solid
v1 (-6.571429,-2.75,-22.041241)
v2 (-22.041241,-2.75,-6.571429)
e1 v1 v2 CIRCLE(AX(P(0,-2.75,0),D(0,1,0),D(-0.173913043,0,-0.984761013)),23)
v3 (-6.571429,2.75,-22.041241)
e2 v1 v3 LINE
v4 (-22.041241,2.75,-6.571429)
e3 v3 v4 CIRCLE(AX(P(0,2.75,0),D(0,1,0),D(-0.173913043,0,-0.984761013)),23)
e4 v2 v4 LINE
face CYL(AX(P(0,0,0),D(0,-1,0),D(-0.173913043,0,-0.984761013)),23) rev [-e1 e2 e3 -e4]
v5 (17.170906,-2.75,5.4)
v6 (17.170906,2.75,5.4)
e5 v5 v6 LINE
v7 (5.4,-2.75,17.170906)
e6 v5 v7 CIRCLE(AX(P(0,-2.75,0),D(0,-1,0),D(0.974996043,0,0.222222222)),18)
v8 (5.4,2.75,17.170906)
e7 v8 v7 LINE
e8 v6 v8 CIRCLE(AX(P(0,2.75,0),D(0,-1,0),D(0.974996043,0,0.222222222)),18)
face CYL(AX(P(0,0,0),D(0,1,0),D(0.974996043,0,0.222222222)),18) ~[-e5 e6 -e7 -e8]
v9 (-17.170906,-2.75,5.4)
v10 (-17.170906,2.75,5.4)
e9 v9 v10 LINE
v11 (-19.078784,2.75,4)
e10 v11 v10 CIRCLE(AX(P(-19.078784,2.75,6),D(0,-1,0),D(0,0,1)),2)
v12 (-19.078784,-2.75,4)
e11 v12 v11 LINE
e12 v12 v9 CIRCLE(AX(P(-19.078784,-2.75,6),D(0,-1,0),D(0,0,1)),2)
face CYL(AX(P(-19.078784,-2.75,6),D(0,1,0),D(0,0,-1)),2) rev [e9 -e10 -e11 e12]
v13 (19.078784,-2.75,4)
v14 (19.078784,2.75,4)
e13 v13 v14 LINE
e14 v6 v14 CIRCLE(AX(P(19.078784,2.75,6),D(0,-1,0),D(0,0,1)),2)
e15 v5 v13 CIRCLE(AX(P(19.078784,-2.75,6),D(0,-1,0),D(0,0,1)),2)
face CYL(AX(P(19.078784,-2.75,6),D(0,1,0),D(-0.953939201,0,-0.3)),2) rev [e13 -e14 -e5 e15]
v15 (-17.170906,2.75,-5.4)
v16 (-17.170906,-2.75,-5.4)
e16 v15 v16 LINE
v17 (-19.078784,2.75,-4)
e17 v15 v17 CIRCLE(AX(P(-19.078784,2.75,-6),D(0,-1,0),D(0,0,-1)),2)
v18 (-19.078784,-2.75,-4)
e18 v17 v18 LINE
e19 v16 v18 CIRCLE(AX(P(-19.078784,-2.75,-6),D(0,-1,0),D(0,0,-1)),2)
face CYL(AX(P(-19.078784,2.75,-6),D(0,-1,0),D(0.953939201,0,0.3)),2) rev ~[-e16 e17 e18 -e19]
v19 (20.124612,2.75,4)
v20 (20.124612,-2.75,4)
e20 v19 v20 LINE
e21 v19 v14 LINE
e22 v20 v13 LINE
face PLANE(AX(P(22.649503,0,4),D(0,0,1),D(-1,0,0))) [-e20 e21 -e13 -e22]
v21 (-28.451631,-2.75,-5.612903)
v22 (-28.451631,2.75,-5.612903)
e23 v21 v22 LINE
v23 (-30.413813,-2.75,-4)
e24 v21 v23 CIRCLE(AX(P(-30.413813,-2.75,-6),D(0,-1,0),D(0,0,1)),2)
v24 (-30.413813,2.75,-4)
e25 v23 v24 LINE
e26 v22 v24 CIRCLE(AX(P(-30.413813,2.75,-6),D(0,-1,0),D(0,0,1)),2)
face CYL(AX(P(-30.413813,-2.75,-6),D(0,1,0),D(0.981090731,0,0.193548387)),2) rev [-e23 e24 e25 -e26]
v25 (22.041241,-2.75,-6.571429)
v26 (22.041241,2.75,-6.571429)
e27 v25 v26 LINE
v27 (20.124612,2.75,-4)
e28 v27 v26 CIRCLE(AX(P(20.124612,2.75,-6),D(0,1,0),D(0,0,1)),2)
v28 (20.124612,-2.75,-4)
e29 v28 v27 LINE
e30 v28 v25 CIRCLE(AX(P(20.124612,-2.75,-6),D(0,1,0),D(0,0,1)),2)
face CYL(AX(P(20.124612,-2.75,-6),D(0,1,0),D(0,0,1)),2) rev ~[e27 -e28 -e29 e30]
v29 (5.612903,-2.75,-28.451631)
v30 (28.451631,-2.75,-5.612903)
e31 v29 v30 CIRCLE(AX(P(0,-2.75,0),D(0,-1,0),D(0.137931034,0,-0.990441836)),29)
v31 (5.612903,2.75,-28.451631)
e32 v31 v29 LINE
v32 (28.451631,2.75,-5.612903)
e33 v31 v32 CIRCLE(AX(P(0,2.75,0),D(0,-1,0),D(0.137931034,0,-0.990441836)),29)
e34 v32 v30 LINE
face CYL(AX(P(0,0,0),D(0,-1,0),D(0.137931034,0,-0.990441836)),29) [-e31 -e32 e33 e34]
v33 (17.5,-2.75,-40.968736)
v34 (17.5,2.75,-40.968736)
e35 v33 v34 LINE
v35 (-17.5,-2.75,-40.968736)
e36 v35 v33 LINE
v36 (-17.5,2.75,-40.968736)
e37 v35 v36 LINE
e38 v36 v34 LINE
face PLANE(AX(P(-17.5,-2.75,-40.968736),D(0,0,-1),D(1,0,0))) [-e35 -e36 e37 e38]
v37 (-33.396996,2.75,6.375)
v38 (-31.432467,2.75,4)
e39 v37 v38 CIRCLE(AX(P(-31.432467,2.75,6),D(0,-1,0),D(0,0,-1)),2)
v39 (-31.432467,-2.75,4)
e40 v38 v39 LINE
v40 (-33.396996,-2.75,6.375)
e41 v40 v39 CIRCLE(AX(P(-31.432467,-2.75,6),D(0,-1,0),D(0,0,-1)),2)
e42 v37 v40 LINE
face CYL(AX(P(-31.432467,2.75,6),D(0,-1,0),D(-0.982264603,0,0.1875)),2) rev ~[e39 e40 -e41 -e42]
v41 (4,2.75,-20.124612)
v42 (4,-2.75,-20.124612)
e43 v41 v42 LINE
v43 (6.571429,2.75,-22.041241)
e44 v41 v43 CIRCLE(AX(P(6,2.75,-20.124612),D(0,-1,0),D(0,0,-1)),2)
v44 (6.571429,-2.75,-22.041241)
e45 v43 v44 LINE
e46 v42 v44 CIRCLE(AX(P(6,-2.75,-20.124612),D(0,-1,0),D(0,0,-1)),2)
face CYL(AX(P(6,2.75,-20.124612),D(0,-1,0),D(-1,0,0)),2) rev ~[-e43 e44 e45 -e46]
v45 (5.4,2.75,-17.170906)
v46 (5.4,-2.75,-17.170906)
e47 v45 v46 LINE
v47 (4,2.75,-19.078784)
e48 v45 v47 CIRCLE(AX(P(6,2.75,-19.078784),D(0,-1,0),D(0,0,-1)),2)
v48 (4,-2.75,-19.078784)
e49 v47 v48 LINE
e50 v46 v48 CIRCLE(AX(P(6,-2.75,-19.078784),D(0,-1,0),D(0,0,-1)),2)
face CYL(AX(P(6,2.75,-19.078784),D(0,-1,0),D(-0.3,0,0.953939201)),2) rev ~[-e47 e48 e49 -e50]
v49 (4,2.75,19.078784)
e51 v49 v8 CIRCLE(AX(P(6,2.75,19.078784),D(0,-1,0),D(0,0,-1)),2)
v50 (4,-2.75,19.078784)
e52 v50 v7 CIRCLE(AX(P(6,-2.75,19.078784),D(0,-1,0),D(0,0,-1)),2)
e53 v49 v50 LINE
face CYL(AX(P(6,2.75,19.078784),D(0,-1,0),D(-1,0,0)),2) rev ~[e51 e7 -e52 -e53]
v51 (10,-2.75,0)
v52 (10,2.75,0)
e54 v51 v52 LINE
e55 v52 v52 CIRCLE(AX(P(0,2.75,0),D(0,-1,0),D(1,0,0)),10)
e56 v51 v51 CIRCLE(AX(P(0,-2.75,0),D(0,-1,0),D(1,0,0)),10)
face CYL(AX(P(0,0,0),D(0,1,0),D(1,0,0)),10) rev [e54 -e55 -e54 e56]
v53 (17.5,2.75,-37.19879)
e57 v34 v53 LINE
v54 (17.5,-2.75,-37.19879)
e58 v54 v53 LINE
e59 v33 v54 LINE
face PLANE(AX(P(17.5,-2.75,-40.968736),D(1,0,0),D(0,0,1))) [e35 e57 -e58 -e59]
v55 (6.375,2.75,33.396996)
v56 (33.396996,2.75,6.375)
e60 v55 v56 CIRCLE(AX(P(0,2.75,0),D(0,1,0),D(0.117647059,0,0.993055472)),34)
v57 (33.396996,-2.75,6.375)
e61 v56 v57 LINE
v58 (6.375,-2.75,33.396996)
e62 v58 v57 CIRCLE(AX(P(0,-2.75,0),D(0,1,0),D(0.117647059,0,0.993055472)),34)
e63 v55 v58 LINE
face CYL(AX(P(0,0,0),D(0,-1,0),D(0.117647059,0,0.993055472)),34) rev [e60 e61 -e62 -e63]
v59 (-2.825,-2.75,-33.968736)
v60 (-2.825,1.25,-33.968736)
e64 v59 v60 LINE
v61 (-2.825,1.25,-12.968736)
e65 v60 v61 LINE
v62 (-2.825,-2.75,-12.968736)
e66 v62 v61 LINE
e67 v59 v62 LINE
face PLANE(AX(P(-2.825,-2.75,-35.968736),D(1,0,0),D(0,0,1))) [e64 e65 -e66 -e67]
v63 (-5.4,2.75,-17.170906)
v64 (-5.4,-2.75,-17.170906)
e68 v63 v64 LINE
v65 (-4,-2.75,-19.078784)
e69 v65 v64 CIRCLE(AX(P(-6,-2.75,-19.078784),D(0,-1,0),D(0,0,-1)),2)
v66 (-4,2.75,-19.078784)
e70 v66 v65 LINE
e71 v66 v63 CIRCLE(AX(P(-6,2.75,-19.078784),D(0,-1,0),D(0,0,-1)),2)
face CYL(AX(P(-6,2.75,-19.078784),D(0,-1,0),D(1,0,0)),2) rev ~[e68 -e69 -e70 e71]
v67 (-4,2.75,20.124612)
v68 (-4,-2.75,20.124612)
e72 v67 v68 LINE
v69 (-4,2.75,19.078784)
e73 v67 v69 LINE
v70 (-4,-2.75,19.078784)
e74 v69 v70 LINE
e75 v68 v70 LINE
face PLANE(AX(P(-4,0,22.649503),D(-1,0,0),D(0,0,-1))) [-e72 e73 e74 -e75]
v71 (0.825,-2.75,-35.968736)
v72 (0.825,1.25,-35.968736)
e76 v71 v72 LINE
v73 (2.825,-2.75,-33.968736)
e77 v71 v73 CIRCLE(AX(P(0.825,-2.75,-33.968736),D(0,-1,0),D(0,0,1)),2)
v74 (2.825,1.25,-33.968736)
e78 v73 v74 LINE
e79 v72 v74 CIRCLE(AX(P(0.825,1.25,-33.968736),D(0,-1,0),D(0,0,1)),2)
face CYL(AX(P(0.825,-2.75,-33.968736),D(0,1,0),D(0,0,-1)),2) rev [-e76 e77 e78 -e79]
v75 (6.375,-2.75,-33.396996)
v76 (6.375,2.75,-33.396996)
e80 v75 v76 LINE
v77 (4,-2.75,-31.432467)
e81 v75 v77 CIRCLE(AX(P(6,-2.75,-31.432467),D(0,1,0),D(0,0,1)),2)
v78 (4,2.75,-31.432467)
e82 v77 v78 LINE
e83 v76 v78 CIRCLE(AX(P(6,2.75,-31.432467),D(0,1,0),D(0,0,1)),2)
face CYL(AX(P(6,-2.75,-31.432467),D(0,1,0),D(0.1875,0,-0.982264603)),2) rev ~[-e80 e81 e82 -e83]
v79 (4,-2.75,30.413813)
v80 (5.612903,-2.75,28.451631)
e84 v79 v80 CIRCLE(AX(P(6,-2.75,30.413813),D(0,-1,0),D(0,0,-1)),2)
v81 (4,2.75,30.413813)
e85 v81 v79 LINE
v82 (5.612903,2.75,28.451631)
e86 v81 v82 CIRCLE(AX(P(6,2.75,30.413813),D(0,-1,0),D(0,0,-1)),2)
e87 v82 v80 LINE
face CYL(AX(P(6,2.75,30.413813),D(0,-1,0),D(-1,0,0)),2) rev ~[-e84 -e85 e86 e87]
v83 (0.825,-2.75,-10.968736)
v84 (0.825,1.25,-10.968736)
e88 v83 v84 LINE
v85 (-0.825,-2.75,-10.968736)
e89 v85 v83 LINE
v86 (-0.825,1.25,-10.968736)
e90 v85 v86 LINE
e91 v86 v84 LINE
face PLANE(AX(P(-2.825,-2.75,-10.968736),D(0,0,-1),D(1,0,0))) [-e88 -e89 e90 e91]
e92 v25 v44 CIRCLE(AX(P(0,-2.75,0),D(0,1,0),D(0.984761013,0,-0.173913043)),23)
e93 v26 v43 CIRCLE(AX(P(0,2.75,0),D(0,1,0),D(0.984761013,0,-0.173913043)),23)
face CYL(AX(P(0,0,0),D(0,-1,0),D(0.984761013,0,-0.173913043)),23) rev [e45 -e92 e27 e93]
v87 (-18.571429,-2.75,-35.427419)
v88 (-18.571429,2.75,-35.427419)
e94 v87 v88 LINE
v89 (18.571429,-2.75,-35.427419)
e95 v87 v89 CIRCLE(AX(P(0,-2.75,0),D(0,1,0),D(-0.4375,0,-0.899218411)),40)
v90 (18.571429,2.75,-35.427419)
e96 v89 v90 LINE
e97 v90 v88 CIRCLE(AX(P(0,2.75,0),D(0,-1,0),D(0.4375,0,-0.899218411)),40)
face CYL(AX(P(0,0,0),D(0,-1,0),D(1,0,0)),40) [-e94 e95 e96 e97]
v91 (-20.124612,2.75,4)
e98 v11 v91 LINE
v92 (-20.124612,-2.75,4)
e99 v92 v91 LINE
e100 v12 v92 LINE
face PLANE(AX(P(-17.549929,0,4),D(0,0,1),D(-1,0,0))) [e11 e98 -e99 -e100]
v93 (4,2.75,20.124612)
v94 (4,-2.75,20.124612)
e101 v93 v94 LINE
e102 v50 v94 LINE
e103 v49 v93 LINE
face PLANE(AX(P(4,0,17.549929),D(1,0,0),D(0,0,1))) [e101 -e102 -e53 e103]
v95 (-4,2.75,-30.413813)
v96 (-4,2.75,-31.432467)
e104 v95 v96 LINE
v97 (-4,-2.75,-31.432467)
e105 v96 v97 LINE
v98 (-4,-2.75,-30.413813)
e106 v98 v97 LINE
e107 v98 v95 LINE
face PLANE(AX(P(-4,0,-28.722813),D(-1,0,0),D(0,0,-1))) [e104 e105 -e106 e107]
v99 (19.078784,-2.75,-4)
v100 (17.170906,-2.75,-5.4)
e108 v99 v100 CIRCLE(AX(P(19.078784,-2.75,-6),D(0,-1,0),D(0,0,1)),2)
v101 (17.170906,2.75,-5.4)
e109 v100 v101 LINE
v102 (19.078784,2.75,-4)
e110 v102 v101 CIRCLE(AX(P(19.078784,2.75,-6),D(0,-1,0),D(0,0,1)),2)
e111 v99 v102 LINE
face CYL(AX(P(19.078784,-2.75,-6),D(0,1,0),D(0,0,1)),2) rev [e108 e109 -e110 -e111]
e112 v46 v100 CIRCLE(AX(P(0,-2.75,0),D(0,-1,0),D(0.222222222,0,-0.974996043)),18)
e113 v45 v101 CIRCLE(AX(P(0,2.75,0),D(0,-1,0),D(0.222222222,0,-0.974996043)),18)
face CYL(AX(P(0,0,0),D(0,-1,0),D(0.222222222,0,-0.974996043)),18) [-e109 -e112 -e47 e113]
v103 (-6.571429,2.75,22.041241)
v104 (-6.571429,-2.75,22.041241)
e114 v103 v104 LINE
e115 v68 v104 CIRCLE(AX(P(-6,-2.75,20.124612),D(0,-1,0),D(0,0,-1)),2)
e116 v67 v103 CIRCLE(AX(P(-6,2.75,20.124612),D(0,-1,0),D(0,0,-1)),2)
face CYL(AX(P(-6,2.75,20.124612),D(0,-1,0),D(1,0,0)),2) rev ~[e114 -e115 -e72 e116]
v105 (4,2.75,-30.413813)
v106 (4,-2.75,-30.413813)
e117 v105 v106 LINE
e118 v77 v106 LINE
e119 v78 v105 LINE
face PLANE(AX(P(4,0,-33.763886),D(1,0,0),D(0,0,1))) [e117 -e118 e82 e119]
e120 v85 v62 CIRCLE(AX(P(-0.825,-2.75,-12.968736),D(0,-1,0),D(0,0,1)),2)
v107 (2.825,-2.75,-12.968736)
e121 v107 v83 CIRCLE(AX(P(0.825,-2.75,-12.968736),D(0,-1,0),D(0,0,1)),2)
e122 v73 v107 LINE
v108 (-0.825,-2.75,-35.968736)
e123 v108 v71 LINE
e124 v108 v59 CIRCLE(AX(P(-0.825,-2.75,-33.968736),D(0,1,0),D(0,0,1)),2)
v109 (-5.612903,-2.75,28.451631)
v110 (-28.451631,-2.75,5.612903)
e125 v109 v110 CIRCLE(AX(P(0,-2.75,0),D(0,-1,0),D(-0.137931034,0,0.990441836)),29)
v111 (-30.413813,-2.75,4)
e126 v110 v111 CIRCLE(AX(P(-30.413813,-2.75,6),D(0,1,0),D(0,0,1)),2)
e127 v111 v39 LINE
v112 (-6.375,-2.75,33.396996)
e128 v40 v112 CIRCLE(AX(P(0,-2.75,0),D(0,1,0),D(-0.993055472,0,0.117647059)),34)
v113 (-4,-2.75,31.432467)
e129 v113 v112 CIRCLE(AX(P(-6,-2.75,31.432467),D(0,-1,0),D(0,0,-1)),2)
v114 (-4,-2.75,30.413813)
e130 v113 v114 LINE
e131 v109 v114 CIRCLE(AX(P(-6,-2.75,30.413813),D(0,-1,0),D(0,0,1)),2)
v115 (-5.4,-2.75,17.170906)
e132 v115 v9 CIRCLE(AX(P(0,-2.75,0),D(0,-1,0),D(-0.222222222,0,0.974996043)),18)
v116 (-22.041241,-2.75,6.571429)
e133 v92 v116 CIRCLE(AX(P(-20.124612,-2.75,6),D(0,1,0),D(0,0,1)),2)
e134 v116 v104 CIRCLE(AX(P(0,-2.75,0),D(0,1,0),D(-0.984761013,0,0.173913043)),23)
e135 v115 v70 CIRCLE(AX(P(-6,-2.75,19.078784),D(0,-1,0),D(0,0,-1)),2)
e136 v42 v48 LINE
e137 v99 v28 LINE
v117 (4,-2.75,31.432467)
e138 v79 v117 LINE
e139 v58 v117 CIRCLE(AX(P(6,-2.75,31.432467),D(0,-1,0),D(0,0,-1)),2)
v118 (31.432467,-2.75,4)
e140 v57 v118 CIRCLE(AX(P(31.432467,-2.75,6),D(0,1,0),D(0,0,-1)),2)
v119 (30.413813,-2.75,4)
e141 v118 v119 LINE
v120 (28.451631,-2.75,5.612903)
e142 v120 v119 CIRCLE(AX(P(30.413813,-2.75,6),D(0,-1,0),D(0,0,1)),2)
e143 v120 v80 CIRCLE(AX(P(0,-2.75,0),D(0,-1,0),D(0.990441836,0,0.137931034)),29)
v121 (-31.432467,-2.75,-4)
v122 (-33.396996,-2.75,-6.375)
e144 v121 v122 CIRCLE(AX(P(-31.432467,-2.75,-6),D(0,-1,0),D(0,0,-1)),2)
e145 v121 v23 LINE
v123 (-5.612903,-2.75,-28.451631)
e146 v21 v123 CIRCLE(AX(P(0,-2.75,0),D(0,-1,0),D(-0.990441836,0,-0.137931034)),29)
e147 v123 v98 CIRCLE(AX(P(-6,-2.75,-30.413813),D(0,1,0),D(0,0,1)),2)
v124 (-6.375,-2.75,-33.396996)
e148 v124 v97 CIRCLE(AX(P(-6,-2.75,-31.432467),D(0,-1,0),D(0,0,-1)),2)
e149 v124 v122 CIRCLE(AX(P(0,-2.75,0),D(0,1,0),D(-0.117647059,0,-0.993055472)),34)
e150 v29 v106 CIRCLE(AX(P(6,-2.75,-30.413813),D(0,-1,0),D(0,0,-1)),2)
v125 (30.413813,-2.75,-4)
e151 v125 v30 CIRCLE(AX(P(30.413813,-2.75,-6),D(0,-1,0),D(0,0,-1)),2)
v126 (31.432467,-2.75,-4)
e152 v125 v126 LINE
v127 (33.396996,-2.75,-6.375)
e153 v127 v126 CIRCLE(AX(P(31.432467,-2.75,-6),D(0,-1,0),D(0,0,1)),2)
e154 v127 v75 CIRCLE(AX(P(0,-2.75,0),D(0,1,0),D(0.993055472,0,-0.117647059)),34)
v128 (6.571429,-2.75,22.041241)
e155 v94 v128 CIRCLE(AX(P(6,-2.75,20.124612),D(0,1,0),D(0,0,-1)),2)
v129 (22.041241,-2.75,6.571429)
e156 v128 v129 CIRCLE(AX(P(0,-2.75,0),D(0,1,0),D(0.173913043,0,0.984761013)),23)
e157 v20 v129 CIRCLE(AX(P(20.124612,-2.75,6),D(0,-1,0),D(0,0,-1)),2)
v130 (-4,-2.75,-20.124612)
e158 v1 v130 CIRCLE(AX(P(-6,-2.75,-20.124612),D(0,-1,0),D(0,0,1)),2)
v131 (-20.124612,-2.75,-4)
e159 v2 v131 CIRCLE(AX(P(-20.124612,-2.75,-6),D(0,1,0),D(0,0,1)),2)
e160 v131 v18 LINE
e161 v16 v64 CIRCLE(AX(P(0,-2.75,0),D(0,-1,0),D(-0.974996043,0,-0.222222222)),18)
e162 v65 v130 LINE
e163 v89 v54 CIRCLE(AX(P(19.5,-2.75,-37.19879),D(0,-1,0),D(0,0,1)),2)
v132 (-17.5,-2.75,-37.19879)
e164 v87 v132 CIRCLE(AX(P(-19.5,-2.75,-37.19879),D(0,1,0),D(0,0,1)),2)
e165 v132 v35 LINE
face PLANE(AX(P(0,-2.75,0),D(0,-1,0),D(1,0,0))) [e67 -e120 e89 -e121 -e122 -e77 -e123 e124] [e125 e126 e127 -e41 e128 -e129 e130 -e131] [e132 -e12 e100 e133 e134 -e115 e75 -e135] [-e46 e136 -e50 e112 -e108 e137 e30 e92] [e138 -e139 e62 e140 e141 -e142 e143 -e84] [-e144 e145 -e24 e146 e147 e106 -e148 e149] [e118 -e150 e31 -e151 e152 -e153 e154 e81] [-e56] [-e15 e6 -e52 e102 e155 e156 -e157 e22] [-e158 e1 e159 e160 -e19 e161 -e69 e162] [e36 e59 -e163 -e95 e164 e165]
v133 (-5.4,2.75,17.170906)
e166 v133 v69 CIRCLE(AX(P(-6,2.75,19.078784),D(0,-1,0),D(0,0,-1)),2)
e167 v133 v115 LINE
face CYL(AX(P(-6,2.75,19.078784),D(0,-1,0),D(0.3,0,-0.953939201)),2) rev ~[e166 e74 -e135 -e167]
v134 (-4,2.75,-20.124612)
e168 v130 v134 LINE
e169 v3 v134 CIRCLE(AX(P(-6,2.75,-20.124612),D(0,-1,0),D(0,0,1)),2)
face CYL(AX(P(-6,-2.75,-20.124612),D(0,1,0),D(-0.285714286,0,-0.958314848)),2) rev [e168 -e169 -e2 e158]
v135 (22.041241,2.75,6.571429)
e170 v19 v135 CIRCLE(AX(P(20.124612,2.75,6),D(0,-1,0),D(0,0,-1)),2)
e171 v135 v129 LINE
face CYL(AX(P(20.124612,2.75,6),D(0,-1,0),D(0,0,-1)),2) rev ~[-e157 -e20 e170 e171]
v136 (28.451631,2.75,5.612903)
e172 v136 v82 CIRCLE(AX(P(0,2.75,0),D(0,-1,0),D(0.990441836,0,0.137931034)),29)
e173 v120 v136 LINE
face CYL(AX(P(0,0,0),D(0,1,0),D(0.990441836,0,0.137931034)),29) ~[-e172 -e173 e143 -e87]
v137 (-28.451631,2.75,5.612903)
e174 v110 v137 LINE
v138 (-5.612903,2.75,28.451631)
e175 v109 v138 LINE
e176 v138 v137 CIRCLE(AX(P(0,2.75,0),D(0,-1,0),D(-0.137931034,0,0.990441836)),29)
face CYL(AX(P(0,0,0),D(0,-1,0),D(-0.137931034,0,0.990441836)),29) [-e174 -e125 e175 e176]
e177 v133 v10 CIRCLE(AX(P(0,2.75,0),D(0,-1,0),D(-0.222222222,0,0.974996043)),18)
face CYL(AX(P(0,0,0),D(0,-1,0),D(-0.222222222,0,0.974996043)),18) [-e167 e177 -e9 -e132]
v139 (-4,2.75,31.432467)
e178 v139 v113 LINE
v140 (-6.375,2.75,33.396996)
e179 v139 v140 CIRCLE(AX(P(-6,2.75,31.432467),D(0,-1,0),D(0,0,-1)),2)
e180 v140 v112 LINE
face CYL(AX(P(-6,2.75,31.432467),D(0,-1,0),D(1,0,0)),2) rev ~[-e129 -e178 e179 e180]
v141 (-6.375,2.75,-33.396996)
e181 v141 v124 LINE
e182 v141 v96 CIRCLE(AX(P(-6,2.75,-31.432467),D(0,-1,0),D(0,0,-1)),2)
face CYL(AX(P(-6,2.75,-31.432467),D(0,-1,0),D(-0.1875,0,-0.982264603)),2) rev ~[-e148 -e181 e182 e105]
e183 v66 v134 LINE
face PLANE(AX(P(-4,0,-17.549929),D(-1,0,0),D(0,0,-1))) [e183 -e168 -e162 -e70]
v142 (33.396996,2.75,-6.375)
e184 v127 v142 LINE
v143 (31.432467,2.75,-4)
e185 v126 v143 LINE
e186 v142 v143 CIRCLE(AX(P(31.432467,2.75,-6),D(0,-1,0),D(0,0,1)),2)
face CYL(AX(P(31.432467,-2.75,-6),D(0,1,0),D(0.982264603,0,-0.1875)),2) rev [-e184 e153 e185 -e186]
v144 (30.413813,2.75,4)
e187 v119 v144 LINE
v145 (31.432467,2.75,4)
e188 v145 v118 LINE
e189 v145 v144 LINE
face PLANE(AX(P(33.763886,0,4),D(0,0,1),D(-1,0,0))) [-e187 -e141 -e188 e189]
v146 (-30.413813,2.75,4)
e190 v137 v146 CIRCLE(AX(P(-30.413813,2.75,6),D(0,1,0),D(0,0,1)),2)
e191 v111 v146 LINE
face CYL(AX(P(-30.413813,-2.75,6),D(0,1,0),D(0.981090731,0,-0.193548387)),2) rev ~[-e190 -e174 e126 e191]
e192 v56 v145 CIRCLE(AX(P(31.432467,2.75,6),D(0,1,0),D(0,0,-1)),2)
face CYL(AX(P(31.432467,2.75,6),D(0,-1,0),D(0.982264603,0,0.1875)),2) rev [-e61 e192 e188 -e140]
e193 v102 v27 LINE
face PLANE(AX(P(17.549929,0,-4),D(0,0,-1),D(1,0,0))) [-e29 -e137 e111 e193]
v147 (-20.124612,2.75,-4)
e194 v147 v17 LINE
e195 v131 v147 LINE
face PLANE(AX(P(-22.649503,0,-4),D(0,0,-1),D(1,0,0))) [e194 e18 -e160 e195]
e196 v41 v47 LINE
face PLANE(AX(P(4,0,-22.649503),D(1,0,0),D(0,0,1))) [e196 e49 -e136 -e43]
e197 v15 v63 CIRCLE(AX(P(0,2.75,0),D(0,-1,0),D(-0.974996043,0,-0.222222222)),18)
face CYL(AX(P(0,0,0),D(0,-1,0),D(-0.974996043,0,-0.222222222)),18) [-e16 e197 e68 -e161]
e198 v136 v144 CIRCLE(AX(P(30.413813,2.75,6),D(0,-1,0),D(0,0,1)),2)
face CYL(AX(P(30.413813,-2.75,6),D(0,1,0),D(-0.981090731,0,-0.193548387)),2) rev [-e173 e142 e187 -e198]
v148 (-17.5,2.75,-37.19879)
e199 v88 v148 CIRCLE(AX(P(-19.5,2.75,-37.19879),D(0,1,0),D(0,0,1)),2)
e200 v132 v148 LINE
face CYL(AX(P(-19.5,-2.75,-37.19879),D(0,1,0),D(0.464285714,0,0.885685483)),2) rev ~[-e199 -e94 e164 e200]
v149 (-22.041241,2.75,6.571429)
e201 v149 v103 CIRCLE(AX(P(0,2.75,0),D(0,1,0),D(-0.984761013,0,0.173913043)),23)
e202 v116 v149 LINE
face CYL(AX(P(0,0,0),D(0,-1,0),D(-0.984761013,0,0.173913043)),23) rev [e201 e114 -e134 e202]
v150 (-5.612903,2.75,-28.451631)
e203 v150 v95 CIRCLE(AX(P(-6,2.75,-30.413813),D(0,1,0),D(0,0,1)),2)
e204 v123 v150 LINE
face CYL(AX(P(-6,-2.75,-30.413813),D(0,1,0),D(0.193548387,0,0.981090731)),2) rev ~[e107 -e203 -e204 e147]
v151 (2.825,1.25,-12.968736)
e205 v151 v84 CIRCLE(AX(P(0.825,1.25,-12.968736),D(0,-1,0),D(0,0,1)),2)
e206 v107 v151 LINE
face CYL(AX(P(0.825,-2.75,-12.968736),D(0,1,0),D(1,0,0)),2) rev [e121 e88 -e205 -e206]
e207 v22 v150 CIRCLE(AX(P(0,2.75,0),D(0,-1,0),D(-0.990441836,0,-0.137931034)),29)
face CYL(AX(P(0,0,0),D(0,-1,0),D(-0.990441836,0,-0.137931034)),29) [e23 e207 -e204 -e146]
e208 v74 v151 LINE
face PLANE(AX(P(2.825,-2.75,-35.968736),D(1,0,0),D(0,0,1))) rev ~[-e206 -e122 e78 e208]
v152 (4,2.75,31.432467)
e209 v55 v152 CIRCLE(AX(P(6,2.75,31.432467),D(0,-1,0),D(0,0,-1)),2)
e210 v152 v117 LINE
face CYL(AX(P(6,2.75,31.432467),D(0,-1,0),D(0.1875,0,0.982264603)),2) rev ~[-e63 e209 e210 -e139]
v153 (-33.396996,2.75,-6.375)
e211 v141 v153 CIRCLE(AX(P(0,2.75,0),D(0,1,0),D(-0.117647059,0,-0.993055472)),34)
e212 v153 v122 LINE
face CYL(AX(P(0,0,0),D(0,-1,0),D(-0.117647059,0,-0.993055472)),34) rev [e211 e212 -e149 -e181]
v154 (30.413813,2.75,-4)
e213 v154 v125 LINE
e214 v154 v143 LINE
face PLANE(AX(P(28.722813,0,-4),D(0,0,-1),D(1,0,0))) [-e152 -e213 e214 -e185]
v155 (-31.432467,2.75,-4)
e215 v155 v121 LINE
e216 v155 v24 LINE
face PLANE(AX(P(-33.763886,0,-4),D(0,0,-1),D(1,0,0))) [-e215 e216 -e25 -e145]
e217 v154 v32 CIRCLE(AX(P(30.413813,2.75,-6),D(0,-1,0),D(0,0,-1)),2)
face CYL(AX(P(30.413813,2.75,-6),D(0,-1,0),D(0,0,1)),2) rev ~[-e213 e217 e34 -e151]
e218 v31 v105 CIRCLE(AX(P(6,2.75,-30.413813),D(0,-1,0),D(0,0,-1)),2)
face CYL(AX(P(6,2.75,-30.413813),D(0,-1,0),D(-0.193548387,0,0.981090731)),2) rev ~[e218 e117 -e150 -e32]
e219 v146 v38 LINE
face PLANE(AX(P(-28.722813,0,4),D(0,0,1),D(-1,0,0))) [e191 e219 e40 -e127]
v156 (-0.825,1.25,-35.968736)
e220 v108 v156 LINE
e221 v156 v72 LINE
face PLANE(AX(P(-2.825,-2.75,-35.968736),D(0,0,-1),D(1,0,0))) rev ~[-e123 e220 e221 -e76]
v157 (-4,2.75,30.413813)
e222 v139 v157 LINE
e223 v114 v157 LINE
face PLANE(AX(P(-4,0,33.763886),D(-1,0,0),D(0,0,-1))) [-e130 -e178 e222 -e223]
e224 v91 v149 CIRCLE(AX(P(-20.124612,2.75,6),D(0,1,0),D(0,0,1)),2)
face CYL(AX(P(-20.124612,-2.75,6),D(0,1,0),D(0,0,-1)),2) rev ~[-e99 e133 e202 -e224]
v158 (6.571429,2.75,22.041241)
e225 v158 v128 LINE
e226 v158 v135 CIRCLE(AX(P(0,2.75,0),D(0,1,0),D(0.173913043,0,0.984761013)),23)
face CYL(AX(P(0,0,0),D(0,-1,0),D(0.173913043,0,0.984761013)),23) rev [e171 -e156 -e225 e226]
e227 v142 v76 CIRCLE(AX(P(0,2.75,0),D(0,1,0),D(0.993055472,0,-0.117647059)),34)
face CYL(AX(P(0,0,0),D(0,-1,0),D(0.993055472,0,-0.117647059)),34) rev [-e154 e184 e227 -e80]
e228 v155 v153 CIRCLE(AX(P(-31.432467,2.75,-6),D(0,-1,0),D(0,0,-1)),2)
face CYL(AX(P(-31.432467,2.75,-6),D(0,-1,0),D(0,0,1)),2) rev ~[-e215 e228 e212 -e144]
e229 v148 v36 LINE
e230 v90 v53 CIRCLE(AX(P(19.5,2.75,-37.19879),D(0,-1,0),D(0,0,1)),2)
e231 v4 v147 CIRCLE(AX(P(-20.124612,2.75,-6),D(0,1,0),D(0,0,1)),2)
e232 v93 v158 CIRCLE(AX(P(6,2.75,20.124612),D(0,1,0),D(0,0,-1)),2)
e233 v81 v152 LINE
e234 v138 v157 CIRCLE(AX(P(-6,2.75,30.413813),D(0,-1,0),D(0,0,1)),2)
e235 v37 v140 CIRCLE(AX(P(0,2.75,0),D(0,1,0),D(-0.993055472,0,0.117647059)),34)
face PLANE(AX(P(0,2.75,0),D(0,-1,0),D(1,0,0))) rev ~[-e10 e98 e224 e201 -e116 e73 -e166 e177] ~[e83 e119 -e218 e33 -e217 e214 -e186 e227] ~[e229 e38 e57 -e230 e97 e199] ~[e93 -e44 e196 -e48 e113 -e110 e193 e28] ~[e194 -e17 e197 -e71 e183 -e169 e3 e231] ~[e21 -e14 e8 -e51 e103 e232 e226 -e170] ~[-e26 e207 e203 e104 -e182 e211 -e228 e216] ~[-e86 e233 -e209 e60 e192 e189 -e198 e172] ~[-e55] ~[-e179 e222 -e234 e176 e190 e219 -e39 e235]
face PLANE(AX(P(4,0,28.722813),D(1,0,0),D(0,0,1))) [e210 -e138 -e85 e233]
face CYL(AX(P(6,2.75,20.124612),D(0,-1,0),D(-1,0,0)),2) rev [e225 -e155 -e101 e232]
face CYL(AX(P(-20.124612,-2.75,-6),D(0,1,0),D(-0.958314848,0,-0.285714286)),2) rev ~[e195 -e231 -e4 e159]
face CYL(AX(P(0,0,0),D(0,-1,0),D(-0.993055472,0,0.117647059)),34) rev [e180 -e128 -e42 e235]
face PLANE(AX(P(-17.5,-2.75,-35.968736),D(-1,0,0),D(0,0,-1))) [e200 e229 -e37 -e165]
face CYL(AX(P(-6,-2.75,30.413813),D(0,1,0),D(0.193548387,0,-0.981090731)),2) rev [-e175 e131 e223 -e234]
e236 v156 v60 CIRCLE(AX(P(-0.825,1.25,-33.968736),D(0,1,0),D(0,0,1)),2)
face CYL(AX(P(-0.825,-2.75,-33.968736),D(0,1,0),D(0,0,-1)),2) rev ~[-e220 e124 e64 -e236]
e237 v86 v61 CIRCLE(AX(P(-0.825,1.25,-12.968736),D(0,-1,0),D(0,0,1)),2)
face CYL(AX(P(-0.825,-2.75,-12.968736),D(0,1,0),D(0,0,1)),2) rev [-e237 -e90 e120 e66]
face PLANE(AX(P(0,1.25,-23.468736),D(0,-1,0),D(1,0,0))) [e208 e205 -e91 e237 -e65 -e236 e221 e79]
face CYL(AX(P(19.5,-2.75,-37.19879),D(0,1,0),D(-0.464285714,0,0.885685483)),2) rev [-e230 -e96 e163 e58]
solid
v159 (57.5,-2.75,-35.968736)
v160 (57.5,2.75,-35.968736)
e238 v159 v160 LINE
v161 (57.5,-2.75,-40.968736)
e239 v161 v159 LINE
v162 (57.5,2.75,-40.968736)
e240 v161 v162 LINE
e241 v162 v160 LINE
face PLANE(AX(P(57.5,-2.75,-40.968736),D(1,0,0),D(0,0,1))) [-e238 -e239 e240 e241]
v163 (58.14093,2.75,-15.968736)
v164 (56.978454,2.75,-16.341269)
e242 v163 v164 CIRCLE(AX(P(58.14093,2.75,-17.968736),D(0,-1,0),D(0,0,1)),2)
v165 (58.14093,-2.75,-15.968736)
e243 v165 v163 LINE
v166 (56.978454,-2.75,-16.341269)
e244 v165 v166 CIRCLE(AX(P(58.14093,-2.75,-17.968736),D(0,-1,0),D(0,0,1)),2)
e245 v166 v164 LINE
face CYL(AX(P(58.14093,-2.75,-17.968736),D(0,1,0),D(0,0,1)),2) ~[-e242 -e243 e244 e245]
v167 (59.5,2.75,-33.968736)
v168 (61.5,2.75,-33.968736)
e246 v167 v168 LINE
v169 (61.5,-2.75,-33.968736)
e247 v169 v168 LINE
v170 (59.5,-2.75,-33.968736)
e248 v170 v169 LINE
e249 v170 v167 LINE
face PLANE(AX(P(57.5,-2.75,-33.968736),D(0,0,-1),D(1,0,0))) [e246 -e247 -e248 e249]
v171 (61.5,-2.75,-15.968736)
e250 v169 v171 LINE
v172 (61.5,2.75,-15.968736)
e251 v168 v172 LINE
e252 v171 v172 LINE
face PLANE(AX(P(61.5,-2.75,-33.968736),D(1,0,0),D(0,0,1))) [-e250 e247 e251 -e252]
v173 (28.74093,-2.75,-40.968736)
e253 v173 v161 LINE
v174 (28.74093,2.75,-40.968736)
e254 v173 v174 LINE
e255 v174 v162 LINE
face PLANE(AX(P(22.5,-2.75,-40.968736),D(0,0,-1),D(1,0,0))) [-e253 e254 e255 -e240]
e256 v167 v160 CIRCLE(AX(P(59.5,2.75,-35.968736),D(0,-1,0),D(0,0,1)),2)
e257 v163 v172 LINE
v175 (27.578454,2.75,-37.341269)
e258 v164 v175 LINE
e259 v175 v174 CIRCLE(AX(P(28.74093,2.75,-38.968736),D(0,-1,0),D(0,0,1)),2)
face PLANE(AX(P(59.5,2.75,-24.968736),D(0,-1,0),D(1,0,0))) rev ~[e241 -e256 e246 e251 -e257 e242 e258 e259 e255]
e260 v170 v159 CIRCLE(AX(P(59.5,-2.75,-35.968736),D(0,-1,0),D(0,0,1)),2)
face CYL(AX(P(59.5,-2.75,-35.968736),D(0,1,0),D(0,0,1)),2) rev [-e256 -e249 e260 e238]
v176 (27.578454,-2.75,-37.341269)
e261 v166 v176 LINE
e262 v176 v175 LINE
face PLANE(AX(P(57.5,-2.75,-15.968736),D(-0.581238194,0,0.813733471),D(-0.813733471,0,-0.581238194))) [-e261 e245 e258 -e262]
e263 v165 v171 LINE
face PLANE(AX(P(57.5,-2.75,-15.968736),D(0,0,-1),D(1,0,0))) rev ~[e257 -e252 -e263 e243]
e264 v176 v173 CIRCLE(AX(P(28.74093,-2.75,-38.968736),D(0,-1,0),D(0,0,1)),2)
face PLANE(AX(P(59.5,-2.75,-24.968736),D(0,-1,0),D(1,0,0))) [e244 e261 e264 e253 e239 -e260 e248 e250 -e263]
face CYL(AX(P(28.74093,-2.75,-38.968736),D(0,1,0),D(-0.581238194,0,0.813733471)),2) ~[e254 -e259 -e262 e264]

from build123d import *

# Parameters (mm, degrees)
F0_R      = 40
F0_R_2    = 10
F1_DEPTH  = 2.75
F3_DEPTH  = 5.5
F5_DEPTH  = 5.5
F6_R      = 2
F6_2_R    = 2
F7_W      = 4
F7_H      = 18
F8_DEPTH  = 5.5
F9_R      = 2
F10_W     = 5.65
F10_H     = 25
F11_DEPTH = 4
F12_R     = 2


with BuildPart() as f1:
    # F0 (on Front) → F1 (new body, symmetric)
    with BuildSketch(Plane.XZ):
        Circle(F0_R)
        with BuildLine():
            ThreePointArc((-4, -33.7638860323), (-24.0416305603, -24.0416305603), (-33.7638860323, -4))
            Line((-33.7638860323, -4), (-28.7228132327, -4))
            ThreePointArc((-28.7228132327, -4), (-20.5060966544, -20.5060966544), (-4, -28.7228132327))
            Line((-4, -28.7228132327), (-4, -33.7638860323))
        make_face(mode=Mode.SUBTRACT)
        with BuildLine():
            ThreePointArc((-17.5499287748, -4), (-12.7279220614, -12.7279220614), (-4, -17.5499287748))
            Line((-4, -17.5499287748), (-4, -22.6495033058))
            ThreePointArc((-4, -22.6495033058), (-16.2634559673, -16.2634559673), (-22.6495033058, -4))
            Line((-22.6495033058, -4), (-17.5499287748, -4))
        make_face(mode=Mode.SUBTRACT)
        with BuildLine():
            ThreePointArc((4, -28.7228132327), (20.5060966544, -20.5060966544), (28.7228132327, -4))
            Line((28.7228132327, -4), (33.7638860323, -4))
            ThreePointArc((33.7638860323, -4), (24.0416305603, -24.0416305603), (4, -33.7638860323))
            Line((4, -33.7638860323), (4, -28.7228132327))
        make_face(mode=Mode.SUBTRACT)
        with BuildLine():
            Line((4, -22.6495033058), (4, -17.5499287748))
            ThreePointArc((4, -17.5499287748), (12.7279220614, -12.7279220614), (17.5499287748, -4))
            Line((17.5499287748, -4), (22.6495033058, -4))
            ThreePointArc((22.6495033058, -4), (16.2634559673, -16.2634559673), (4, -22.6495033058))
        make_face(mode=Mode.SUBTRACT)
        with BuildLine():
            Line((-4, 22.6495033058), (-4, 17.5499287748))
            ThreePointArc((-4, 17.5499287748), (-12.7279220614, 12.7279220614), (-17.5499287748, 4))
            Line((-17.5499287748, 4), (-22.6495033058, 4))
            ThreePointArc((-22.6495033058, 4), (-16.2634559673, 16.2634559673), (-4, 22.6495033058))
        make_face(mode=Mode.SUBTRACT)
        with BuildLine():
            ThreePointArc((-33.7638860323, 4), (-24.0416305603, 24.0416305603), (-4, 33.7638860323))
            Line((-4, 33.7638860323), (-4, 28.7228132327))
            ThreePointArc((-4, 28.7228132327), (-20.5060966544, 20.5060966544), (-28.7228132327, 4))
            Line((-28.7228132327, 4), (-33.7638860323, 4))
        make_face(mode=Mode.SUBTRACT)
        Circle(F0_R_2, mode=Mode.SUBTRACT)
        with BuildLine():
            Line((22.6495033058, 4), (17.5499287748, 4))
            ThreePointArc((17.5499287748, 4), (12.7279220614, 12.7279220614), (4, 17.5499287748))
            Line((4, 17.5499287748), (4, 22.6495033058))
            ThreePointArc((4, 22.6495033058), (16.2634559673, 16.2634559673), (22.6495033058, 4))
        make_face(mode=Mode.SUBTRACT)
        with BuildLine():
            ThreePointArc((28.7228132327, 4), (20.5060966544, 20.5060966544), (4, 28.7228132327))
            Line((4, 28.7228132327), (4, 33.7638860323))
            ThreePointArc((4, 33.7638860323), (24.0416305603, 24.0416305603), (33.7638860323, 4))
            Line((33.7638860323, 4), (28.7228132327, 4))
        make_face(mode=Mode.SUBTRACT)
    extrude(amount=F1_DEPTH, both=True)

    # F2 (on face) → F3 (join)
    with BuildSketch(Plane.XZ.offset(2.75)):
        with BuildLine():
            ThreePointArc((17.5, -35.9687364248), (0, -40), (-17.5, -35.9687364248))
            Line((-17.5, -35.9687364248), (-17.5, -40.9687364248))
            Line((-17.5, -40.9687364248), (17.5, -40.9687364248))
            Line((17.5, -40.9687364248), (17.5, -35.9687364248))
        make_face()
    extrude(amount=-F3_DEPTH)

    # F6
    f6_edges = [f1.edges().sort_by_distance(p)[0] for p in [
        (17.549929, 0, 4),
        (28.722813, 0, 4),
        (4, 0, 28.722813),
        (-22.649503, 0, 4),
        (-4, 0, 28.722813),
        (-28.722813, 0, 4),
        (-17.549929, 0, 4),
        (-4, 0, 17.549929),
        (4, 0, 33.763886),
        (33.763886, 0, 4),
        (-4, 0, 33.763886),
        (-33.763886, 0, 4),
        (-17.549929, 0, -4),
        (-28.722813, 0, -4),
        (28.722813, 0, -4),
        (4, 0, -28.722813),
        (33.763886, 0, -4),
        (22.649503, 0, -4),
        (-4, 0, -28.722813),
        (-33.763886, 0, -4),
        (-22.649503, 0, -4),
        (-4, 0, -33.763886),
        (4, 0, -33.763886),
        (22.649503, 0, 4),
        (-4, 0, 22.649503),
        (-4, 0, -17.549929),
        (4, 0, -22.649503),
        (-4, 0, -22.649503),
        (-17.5, 0, -35.968736),
        (17.5, 0, -35.968736),
        (4, 0, 22.649503),
        (4, 0, 17.549929),
        (17.549929, 0, -4),
        (4, 0, -17.549929),
    ]]
    fillet(f6_edges, radius=F6_R)

    # F10 (on face) → F11 (cut)
    with BuildSketch(Plane.XZ.offset(2.75)):
        with Locations((0, -23.4687364248)):
            Rectangle(F10_W, F10_H)
    extrude(amount=-F11_DEPTH, mode=Mode.SUBTRACT)

    # F12
    f12_edges = [f1.edges().sort_by_distance(p)[0] for p in [
        (-2.825, -0.75, -10.968736),
        (2.825, -0.75, -10.968736),
        (2.825, -0.75, -35.968736),
        (-2.825, -0.75, -35.968736),
    ]]
    fillet(f12_edges, radius=F12_R)


with BuildPart() as f5:
    # F4 (on face) → F5 (new body)
    with BuildSketch(Plane.XZ.offset(2.75)):
        Polygon((57.5, -15.9687364248), (22.5, -40.9687364248), (57.5, -40.9687364248), align=None)
    extrude(amount=-F5_DEPTH)

    # F6#2
    f6_2_edges = [f5.edges().sort_by_distance(p)[0] for p in [
        (22.5, 0, -40.968736),
    ]]
    fillet(f6_2_edges, radius=F6_2_R)

    # F7 (on face) → F8 (join)
    with BuildSketch(Plane.XZ.offset(2.75)):
        with Locations((59.5, -24.9687364248)):
            Rectangle(F7_W, F7_H)
    extrude(amount=-F8_DEPTH)

    # F9
    f9_edges = [f5.edges().sort_by_distance(p)[0] for p in [
        (57.5, 0, -33.968736),
        (57.5, 0, -15.968736),
    ]]
    fillet(f9_edges, radius=F9_R)


solid = Compound([f1.part, f5.part])
